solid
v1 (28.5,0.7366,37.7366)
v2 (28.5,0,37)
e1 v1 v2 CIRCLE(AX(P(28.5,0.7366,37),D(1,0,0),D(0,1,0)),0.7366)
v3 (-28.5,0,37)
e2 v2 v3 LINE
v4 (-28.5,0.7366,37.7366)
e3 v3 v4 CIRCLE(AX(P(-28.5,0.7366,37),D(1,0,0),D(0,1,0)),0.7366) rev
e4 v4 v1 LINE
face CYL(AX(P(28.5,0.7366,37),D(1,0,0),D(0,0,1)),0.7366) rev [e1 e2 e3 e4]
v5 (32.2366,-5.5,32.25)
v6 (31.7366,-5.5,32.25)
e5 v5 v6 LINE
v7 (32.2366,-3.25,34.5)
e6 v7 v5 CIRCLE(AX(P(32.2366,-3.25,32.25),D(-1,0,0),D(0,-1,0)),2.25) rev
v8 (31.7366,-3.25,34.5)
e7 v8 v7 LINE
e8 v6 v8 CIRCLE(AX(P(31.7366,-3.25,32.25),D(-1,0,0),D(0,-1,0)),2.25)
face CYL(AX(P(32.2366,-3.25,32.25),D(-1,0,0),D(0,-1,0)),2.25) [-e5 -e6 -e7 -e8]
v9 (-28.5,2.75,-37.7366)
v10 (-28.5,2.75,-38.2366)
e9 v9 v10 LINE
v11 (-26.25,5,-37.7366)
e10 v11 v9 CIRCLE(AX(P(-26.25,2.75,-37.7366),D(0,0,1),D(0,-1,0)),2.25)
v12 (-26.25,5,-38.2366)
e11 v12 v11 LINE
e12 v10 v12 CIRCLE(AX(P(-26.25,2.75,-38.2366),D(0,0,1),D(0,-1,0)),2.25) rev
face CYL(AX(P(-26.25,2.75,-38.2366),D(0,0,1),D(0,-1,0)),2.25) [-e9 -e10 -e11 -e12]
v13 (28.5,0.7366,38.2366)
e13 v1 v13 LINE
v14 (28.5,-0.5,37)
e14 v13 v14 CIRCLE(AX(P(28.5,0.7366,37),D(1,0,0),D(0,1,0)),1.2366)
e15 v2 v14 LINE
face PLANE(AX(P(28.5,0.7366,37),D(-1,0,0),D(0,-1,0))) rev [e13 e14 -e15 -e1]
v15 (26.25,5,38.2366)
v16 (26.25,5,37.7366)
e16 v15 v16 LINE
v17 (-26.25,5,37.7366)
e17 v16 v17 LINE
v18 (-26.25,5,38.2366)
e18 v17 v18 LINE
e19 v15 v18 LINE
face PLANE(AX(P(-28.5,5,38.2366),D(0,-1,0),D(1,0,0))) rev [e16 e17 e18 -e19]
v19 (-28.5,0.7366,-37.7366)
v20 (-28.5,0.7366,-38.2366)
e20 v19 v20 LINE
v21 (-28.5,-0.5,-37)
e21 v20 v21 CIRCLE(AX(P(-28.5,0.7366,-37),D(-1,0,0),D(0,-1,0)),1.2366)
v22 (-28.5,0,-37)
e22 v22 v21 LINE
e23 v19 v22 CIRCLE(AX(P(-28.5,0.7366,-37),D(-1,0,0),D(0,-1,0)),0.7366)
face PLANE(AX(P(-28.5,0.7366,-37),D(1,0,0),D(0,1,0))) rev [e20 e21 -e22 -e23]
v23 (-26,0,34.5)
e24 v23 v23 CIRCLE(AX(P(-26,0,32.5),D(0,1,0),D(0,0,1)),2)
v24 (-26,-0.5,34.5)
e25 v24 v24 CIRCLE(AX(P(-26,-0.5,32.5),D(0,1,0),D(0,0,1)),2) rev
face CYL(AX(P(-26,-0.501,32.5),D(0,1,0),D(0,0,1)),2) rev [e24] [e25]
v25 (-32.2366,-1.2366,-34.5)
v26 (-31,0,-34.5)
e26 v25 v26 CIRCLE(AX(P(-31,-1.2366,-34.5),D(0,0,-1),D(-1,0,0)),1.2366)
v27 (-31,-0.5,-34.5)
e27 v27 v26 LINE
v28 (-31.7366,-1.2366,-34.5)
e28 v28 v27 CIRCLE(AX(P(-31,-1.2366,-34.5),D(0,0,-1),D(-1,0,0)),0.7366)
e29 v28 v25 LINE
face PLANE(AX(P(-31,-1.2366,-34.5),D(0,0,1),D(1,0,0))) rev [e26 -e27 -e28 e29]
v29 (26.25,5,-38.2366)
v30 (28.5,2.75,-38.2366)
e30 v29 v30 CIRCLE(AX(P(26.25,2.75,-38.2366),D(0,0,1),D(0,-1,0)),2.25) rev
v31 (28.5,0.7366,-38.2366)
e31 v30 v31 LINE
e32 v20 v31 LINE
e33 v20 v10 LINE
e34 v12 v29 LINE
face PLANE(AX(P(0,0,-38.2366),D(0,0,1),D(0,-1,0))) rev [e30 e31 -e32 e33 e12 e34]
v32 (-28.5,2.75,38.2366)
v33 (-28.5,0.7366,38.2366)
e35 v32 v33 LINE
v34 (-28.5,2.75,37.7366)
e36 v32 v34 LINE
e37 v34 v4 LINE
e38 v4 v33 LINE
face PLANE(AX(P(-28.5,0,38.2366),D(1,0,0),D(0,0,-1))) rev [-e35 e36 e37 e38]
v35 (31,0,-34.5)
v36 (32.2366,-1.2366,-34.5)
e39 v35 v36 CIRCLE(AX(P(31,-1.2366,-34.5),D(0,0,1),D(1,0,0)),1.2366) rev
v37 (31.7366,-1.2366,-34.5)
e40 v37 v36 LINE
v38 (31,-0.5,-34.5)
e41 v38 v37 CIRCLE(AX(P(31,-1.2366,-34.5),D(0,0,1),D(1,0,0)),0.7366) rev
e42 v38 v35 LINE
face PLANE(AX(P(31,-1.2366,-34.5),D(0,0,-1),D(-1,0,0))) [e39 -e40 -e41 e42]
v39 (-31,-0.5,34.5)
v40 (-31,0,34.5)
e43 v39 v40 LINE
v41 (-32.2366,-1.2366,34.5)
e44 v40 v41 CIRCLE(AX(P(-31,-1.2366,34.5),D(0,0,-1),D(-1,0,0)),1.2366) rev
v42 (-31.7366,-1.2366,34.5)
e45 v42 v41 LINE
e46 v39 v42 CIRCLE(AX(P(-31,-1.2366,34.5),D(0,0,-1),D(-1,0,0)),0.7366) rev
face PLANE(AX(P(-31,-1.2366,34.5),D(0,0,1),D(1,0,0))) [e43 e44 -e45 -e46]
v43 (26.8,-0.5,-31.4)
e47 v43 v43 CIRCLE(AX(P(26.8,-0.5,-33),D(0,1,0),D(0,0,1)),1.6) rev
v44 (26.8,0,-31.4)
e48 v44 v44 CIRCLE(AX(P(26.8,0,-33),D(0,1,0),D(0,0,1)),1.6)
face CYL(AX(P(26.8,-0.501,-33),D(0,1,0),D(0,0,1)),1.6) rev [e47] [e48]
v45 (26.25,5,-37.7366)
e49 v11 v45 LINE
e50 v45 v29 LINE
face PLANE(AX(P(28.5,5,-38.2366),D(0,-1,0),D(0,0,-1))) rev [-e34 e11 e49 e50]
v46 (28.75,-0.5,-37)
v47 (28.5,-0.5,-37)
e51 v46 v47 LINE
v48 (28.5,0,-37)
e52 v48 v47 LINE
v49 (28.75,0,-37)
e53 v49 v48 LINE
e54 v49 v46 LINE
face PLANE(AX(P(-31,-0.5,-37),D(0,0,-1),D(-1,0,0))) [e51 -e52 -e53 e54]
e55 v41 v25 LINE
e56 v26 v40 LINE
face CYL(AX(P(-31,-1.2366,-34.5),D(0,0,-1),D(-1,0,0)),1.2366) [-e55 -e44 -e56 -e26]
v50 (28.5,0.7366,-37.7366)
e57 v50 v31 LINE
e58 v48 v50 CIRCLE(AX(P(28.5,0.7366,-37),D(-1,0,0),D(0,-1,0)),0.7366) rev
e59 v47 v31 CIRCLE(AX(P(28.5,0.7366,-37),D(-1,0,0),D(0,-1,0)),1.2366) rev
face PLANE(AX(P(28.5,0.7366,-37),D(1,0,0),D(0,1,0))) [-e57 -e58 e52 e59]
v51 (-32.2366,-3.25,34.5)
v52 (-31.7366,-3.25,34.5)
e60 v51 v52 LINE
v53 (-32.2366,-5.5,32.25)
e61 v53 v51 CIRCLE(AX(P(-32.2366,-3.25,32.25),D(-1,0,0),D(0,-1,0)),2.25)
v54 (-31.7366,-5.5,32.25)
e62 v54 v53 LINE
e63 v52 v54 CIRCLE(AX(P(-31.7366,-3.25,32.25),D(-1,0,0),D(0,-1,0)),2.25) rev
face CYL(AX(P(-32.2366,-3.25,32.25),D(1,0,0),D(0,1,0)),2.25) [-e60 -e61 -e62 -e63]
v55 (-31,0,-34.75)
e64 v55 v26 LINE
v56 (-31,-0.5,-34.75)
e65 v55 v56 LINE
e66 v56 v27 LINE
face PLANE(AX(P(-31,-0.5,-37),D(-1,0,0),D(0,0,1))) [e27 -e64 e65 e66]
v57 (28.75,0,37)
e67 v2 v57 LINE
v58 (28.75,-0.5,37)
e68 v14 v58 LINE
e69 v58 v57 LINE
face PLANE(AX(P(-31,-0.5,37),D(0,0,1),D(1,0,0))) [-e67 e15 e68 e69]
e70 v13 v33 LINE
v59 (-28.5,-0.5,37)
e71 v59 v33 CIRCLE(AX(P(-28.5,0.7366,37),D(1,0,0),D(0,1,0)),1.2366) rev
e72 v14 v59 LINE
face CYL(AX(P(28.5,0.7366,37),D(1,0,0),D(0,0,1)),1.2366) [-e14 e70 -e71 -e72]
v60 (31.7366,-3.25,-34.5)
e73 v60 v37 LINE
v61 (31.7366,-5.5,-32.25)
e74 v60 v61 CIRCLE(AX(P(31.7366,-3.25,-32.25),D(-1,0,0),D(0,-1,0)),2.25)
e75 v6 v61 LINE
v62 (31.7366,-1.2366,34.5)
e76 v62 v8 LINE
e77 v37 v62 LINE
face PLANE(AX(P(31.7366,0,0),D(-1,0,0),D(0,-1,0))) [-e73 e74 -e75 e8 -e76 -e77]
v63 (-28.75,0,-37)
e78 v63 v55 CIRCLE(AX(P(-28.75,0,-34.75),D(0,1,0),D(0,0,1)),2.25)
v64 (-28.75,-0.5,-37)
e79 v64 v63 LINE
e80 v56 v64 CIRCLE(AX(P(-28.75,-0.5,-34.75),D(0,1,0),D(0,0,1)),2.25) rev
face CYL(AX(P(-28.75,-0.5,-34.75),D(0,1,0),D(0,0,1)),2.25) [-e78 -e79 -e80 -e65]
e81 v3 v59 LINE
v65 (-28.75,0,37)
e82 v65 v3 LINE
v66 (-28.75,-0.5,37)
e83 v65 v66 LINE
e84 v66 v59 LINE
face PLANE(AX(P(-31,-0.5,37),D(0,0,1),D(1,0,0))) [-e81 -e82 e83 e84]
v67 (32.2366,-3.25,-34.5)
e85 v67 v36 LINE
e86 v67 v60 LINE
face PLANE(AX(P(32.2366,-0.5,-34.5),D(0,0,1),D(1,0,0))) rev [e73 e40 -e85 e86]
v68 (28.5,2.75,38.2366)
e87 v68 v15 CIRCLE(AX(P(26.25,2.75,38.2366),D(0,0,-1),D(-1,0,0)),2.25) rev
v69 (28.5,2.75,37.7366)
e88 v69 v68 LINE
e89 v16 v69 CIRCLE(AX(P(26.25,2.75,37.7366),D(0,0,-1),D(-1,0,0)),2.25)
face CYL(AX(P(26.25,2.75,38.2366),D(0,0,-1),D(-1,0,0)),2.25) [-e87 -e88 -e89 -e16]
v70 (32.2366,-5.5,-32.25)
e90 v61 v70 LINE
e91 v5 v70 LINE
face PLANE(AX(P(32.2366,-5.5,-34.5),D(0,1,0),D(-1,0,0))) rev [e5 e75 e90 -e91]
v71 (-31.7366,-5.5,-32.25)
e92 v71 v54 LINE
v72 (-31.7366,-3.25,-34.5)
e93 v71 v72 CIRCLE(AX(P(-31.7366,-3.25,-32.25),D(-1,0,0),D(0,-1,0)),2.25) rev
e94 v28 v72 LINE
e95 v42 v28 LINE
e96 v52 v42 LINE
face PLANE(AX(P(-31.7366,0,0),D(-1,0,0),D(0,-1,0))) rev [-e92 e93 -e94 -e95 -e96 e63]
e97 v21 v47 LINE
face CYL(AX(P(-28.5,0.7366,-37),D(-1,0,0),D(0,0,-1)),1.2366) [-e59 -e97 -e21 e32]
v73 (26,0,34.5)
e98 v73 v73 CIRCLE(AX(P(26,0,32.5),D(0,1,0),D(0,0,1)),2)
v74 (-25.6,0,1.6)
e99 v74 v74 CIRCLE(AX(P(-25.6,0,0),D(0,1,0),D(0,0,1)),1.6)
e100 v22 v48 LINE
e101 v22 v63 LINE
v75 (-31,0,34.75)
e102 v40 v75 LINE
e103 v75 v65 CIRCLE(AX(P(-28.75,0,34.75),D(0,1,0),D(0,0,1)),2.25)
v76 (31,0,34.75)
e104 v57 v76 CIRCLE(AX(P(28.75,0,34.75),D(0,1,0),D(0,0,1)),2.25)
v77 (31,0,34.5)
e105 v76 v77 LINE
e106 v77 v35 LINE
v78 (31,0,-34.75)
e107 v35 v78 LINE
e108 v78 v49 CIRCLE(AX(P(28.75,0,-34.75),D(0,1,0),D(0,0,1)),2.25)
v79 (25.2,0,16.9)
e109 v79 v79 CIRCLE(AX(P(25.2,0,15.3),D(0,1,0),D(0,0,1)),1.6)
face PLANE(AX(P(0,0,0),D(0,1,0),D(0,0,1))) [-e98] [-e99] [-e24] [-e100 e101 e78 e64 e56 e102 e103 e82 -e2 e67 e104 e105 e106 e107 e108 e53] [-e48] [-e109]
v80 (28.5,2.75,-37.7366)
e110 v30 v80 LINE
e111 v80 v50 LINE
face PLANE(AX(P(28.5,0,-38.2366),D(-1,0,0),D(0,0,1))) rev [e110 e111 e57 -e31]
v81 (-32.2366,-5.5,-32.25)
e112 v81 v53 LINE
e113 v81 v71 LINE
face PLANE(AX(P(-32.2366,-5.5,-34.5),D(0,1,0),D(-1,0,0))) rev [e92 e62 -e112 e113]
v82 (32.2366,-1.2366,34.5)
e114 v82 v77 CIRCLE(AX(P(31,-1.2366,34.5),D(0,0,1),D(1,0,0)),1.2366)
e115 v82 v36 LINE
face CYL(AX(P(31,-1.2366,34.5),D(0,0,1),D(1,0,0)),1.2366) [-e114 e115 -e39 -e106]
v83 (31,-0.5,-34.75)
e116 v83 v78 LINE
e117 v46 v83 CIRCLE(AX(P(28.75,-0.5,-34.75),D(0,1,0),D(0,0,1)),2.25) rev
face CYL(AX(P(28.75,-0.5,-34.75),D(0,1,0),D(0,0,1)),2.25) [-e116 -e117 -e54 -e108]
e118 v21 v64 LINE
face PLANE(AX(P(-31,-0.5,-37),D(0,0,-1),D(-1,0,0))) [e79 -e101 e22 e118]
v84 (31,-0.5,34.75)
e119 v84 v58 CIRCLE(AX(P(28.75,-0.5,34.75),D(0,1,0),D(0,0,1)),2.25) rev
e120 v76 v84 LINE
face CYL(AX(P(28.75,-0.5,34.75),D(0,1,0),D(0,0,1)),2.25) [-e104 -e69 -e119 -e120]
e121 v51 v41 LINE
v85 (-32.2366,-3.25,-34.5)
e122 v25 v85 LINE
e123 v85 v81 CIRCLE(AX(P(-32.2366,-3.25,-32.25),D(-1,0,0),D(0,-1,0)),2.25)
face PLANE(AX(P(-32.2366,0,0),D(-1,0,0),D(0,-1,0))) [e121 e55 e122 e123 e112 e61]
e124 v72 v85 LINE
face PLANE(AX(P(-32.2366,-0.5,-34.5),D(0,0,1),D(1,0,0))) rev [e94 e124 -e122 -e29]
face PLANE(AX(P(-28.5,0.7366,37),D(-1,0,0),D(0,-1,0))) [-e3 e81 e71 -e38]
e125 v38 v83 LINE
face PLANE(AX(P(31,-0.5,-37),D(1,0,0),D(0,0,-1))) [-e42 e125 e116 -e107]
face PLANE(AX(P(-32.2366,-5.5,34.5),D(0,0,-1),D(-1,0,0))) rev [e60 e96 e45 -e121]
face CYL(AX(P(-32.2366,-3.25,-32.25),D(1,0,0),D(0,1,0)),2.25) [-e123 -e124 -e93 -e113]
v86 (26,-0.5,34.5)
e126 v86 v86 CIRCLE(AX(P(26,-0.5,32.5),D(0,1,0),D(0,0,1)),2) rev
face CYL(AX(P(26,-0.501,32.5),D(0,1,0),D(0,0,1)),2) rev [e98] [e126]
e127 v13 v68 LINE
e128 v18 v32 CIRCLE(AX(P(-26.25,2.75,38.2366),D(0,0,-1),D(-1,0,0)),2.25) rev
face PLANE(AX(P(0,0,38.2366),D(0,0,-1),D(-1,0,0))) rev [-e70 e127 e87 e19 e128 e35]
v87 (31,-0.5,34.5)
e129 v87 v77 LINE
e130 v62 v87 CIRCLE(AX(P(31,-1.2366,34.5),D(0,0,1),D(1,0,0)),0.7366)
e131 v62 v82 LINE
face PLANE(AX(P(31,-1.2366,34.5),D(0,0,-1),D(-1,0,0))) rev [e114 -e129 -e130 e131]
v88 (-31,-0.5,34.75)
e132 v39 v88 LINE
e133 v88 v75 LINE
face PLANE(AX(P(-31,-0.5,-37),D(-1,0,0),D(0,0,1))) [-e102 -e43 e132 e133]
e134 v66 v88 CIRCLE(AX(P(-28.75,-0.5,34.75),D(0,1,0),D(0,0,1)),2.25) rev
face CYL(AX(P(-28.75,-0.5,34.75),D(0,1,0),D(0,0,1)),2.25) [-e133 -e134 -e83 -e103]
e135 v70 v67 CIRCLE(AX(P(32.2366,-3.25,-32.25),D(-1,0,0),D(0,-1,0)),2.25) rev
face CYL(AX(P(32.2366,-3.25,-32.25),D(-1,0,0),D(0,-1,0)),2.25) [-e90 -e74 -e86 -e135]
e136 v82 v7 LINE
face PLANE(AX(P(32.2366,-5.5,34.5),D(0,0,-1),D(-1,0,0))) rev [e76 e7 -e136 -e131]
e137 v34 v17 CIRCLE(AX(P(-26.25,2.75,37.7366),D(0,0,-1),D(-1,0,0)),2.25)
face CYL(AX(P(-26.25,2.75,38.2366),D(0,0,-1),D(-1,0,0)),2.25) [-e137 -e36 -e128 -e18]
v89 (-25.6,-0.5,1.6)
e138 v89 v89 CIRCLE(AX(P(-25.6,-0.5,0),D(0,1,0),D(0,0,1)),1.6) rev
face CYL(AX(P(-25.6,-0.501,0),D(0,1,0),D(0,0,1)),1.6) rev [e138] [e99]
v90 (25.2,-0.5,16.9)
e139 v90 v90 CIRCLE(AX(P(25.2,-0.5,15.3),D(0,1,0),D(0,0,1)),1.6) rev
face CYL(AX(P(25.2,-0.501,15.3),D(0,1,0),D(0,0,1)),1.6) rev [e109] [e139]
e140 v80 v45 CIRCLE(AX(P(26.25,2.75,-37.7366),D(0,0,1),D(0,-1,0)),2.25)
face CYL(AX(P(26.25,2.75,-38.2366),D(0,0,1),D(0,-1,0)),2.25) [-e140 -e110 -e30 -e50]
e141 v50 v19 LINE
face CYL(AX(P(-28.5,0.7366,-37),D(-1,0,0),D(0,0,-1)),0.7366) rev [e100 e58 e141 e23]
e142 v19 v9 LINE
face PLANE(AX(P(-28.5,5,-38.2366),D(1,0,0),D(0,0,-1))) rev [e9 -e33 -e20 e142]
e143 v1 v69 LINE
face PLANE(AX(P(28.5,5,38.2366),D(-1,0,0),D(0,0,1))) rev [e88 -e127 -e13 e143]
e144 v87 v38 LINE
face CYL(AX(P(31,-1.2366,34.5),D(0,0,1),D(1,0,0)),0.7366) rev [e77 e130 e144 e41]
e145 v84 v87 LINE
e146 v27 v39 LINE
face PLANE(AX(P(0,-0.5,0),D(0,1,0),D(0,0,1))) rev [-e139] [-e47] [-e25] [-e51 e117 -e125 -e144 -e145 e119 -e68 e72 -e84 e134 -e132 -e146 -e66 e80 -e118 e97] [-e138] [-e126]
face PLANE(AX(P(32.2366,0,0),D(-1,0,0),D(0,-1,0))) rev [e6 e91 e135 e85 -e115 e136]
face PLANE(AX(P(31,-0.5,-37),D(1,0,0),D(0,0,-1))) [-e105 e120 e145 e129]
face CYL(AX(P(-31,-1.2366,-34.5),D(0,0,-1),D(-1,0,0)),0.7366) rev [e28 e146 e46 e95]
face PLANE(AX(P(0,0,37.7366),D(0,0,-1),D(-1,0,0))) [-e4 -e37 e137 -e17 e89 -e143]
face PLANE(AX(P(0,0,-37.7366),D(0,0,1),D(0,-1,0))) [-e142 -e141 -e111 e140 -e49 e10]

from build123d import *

# Parameters (mm, degrees)
SKETCH2_W               = 62
SKETCH2_H               = 74
BASE_FLANGE1_DEPTH      = 0.5
CUT_EXTRUDE1_REACH      = 50.273
SKETCH5_R               = 2
SKETCH5_R_2             = 1.6
EDGE_FLANGE1_DEPTH      = 57
EDGE_FLANGE1_BEND_DEPTH = 57
EDGE_FLANGE2_DEPTH      = 69
EDGE_FLANGE2_BEND_DEPTH = 69
BREAK_CORNER1_START     = -32.2366
BREAK_CORNER1_DEPTH     = 64.4732
BREAK_CORNER1_START_2   = -38.2366
BREAK_CORNER1_2_DEPTH   = 76.4732
BREAK_CORNER1_START_3   = -0.5
BREAK_CORNER1_3_DEPTH   = 0.5


# Read off the part's stored shape, not the designer's step: Break-Corner1
# Sheet-metal steps are written as plain solids
with BuildPart() as part:
    # Sketch2 → Base-Flange1 (new body)
    with BuildSketch(Plane(origin=(0, 0, 0), x_dir=(1, 0, 0), z_dir=(0, 1, 0))):
        Rectangle(SKETCH2_W, SKETCH2_H)
    extrude(amount=-BASE_FLANGE1_DEPTH)

    # Sketch5 → Cut-Extrude1 (cut, up to next)
    with BuildSketch(Plane(origin=(0, 0, 0), x_dir=(1, 0, 0), z_dir=(0, 1, 0)), mode=Mode.PRIVATE) as cut_extrude1_sk1:
        with Locations(Location((-26, -32.5, 0), (0, 0, 270))):
            Circle(SKETCH5_R)
    cut_extrude1_tool1 = extrude(cut_extrude1_sk1.sketch, amount=-CUT_EXTRUDE1_REACH, mode=Mode.PRIVATE) & part.part
    # Sketch5 → Cut-Extrude1 (cut, up to next)
    with BuildSketch(Plane(origin=(0, 0, 0), x_dir=(1, 0, 0), z_dir=(0, 1, 0)), mode=Mode.PRIVATE) as cut_extrude1_sk2:
        with Locations(Location((25.2, -15.3, 0), (0, 0, 270))):
            Circle(SKETCH5_R_2)
    cut_extrude1_tool2 = extrude(cut_extrude1_sk2.sketch, amount=-CUT_EXTRUDE1_REACH, mode=Mode.PRIVATE) & part.part
    # Sketch5 → Cut-Extrude1 (cut, up to next)
    with BuildSketch(Plane(origin=(0, 0, 0), x_dir=(1, 0, 0), z_dir=(0, 1, 0)), mode=Mode.PRIVATE) as cut_extrude1_sk3:
        with Locations(Location((-25.6, 0, 0), (0, 0, 270))):
            Circle(SKETCH5_R_2)
    cut_extrude1_tool3 = extrude(cut_extrude1_sk3.sketch, amount=-CUT_EXTRUDE1_REACH, mode=Mode.PRIVATE) & part.part
    # Sketch5 → Cut-Extrude1 (cut, up to next)
    with BuildSketch(Plane(origin=(0, 0, 0), x_dir=(1, 0, 0), z_dir=(0, 1, 0)), mode=Mode.PRIVATE) as cut_extrude1_sk4:
        with Locations(Location((26.8, 33, 0), (0, 0, 270))):
            Circle(SKETCH5_R_2)
    cut_extrude1_tool4 = extrude(cut_extrude1_sk4.sketch, amount=-CUT_EXTRUDE1_REACH, mode=Mode.PRIVATE) & part.part
    # Sketch5 → Cut-Extrude1 (cut, up to next)
    with BuildSketch(Plane(origin=(0, 0, 0), x_dir=(1, 0, 0), z_dir=(0, 1, 0)), mode=Mode.PRIVATE) as cut_extrude1_sk5:
        with Locations(Location((26, -32.5, 0), (0, 0, 270))):
            Circle(SKETCH5_R)
    cut_extrude1_tool5 = extrude(cut_extrude1_sk5.sketch, amount=-CUT_EXTRUDE1_REACH, mode=Mode.PRIVATE) & part.part
    add(cut_extrude1_tool1.solids().sort_by_distance((-26, 0, 32.5))[0], mode=Mode.SUBTRACT)
    add(cut_extrude1_tool2.solids().sort_by_distance((25.2, 0, 15.3))[0], mode=Mode.SUBTRACT)
    add(cut_extrude1_tool3.solids().sort_by_distance((-25.6, 0, 0))[0], mode=Mode.SUBTRACT)
    add(cut_extrude1_tool4.solids().sort_by_distance((26.8, 0, -33))[0], mode=Mode.SUBTRACT)
    add(cut_extrude1_tool5.solids().sort_by_distance((26, 0, 32.5))[0], mode=Mode.SUBTRACT)

    # Edge-Flange1 section (across the edge) → Edge-Flange1 (add)
    with BuildSketch(Plane(origin=(28.5, 0, -37.7366), x_dir=(0, 0, 1), z_dir=(-1, 0, 0))):
        with BuildLine():
            Line((-0.5, 0.7366), (-0.5, 5))
            Line((-0.5, 5), (0, 5))
            Line((0, 5), (0, 0.7366))
            ThreePointArc((0, 0.7366), (0.215745145, 0.215745145), (0.7366, 0))
            Line((0.7366, 0), (0.7366, -0.5))
            ThreePointArc((0.7366, -0.5), (-0.137808246, -0.137808246), (-0.5, 0.7366))
        make_face()
    extrude(amount=EDGE_FLANGE1_DEPTH)

    # Edge-Flange1 section 2 (across the edge) → Edge-Flange1 bend (add)
    with BuildSketch(Plane(origin=(-28.5, 0, 37.7366), x_dir=(0, 0, -1), z_dir=(1, 0, 0))):
        with BuildLine():
            Line((-0.5, 0.7366), (-0.5, 5))
            Line((-0.5, 5), (0, 5))
            Line((0, 5), (0, 0.7366))
            ThreePointArc((0, 0.7366), (0.215745145, 0.215745145), (0.7366, 0))
            Line((0.7366, 0), (0.7366, -0.5))
            ThreePointArc((0.7366, -0.5), (-0.137808246, -0.137808246), (-0.5, 0.7366))
        make_face()
    extrude(amount=EDGE_FLANGE1_BEND_DEPTH)

    # Edge-Flange2 section (across the edge) → Edge-Flange2 (add)
    with BuildSketch(Plane(origin=(31.7366, -0.5, -34.5), x_dir=(-1, 0, 0), z_dir=(0, 0, 1))):
        with BuildLine():
            Line((-0.5, 0.7366), (-0.5, 5))
            Line((-0.5, 5), (0, 5))
            Line((0, 5), (0, 0.7366))
            ThreePointArc((0, 0.7366), (0.215745145, 0.215745145), (0.7366, 0))
            Line((0.7366, 0), (0.7366, -0.5))
            ThreePointArc((0.7366, -0.5), (-0.137808246, -0.137808246), (-0.5, 0.7366))
        make_face()
    extrude(amount=EDGE_FLANGE2_DEPTH)

    # Edge-Flange2 section 2 (across the edge) → Edge-Flange2 bend (add)
    with BuildSketch(Plane(origin=(-31.7366, -0.5, 34.5), x_dir=(1, 0, 0), z_dir=(0, 0, -1))):
        with BuildLine():
            Line((-0.5, 0.7366), (-0.5, 5))
            Line((-0.5, 5), (0, 5))
            Line((0, 5), (0, 0.7366))
            ThreePointArc((0, 0.7366), (0.215745145, 0.215745145), (0.7366, 0))
            Line((0.7366, 0), (0.7366, -0.5))
            ThreePointArc((0.7366, -0.5), (-0.137808246, -0.137808246), (-0.5, 0.7366))
        make_face()
    extrude(amount=EDGE_FLANGE2_BEND_DEPTH)

    # Break-Corner1 outline → Break-Corner1 (cut)
    with BuildSketch(Plane.YZ.offset(BREAK_CORNER1_START)):
        with BuildLine():
            Line((-5.5, 34.5), (-5.5, 32.25))
            ThreePointArc((-5.5, 32.25), (-4.840990258, 33.840990258), (-3.25, 34.5))
            Line((-3.25, 34.5), (-5.5, 34.5))
        make_face()
        with BuildLine():
            ThreePointArc((-3.25, -34.5), (-4.840990258, -33.840990258), (-5.5, -32.25))
            Line((-5.5, -32.25), (-5.5, -34.5))
            Line((-5.5, -34.5), (-3.25, -34.5))
        make_face()
    extrude(amount=BREAK_CORNER1_DEPTH, mode=Mode.SUBTRACT)

    # Break-Corner1 2 outline → Break-Corner1 2 (cut)
    with BuildSketch(Plane.XY.offset(BREAK_CORNER1_START_2)):
        with BuildLine():
            ThreePointArc((-28.5, 2.75), (-27.840990258, 4.340990258), (-26.25, 5))
            Line((-26.25, 5), (-28.5, 5))
            Line((-28.5, 5), (-28.5, 2.75))
        make_face()
        with BuildLine():
            ThreePointArc((26.25, 5), (27.840990258, 4.340990258), (28.5, 2.75))
            Line((28.5, 2.75), (28.5, 5))
            Line((28.5, 5), (26.25, 5))
        make_face()
    extrude(amount=BREAK_CORNER1_2_DEPTH, mode=Mode.SUBTRACT)

    # Break-Corner1 3 outline → Break-Corner1 3 (cut)
    with BuildSketch(Plane(origin=(0, 0, 0), x_dir=(1, 0, 0), z_dir=(0, 1, 0)).offset(BREAK_CORNER1_START_3)):
        with BuildLine():
            ThreePointArc((-28.75, -37), (-30.340990258, -36.340990258), (-31, -34.75))
            Line((-31, -34.75), (-31, -37))
            Line((-31, -37), (-28.75, -37))
        make_face()
        with BuildLine():
            ThreePointArc((-31, 34.75), (-30.340990258, 36.340990258), (-28.75, 37))
            Line((-28.75, 37), (-31, 37))
            Line((-31, 37), (-31, 34.75))
        make_face()
        with BuildLine():
            ThreePointArc((28.75, 37), (30.340990258, 36.340990258), (31, 34.75))
            Line((31, 34.75), (31, 37))
            Line((31, 37), (28.75, 37))
        make_face()
        with BuildLine():
            ThreePointArc((31, -34.75), (30.340990258, -36.340990258), (28.75, -37))
            Line((28.75, -37), (31, -37))
            Line((31, -37), (31, -34.75))
        make_face()
    extrude(amount=BREAK_CORNER1_3_DEPTH, mode=Mode.SUBTRACT)


solid = part.part
